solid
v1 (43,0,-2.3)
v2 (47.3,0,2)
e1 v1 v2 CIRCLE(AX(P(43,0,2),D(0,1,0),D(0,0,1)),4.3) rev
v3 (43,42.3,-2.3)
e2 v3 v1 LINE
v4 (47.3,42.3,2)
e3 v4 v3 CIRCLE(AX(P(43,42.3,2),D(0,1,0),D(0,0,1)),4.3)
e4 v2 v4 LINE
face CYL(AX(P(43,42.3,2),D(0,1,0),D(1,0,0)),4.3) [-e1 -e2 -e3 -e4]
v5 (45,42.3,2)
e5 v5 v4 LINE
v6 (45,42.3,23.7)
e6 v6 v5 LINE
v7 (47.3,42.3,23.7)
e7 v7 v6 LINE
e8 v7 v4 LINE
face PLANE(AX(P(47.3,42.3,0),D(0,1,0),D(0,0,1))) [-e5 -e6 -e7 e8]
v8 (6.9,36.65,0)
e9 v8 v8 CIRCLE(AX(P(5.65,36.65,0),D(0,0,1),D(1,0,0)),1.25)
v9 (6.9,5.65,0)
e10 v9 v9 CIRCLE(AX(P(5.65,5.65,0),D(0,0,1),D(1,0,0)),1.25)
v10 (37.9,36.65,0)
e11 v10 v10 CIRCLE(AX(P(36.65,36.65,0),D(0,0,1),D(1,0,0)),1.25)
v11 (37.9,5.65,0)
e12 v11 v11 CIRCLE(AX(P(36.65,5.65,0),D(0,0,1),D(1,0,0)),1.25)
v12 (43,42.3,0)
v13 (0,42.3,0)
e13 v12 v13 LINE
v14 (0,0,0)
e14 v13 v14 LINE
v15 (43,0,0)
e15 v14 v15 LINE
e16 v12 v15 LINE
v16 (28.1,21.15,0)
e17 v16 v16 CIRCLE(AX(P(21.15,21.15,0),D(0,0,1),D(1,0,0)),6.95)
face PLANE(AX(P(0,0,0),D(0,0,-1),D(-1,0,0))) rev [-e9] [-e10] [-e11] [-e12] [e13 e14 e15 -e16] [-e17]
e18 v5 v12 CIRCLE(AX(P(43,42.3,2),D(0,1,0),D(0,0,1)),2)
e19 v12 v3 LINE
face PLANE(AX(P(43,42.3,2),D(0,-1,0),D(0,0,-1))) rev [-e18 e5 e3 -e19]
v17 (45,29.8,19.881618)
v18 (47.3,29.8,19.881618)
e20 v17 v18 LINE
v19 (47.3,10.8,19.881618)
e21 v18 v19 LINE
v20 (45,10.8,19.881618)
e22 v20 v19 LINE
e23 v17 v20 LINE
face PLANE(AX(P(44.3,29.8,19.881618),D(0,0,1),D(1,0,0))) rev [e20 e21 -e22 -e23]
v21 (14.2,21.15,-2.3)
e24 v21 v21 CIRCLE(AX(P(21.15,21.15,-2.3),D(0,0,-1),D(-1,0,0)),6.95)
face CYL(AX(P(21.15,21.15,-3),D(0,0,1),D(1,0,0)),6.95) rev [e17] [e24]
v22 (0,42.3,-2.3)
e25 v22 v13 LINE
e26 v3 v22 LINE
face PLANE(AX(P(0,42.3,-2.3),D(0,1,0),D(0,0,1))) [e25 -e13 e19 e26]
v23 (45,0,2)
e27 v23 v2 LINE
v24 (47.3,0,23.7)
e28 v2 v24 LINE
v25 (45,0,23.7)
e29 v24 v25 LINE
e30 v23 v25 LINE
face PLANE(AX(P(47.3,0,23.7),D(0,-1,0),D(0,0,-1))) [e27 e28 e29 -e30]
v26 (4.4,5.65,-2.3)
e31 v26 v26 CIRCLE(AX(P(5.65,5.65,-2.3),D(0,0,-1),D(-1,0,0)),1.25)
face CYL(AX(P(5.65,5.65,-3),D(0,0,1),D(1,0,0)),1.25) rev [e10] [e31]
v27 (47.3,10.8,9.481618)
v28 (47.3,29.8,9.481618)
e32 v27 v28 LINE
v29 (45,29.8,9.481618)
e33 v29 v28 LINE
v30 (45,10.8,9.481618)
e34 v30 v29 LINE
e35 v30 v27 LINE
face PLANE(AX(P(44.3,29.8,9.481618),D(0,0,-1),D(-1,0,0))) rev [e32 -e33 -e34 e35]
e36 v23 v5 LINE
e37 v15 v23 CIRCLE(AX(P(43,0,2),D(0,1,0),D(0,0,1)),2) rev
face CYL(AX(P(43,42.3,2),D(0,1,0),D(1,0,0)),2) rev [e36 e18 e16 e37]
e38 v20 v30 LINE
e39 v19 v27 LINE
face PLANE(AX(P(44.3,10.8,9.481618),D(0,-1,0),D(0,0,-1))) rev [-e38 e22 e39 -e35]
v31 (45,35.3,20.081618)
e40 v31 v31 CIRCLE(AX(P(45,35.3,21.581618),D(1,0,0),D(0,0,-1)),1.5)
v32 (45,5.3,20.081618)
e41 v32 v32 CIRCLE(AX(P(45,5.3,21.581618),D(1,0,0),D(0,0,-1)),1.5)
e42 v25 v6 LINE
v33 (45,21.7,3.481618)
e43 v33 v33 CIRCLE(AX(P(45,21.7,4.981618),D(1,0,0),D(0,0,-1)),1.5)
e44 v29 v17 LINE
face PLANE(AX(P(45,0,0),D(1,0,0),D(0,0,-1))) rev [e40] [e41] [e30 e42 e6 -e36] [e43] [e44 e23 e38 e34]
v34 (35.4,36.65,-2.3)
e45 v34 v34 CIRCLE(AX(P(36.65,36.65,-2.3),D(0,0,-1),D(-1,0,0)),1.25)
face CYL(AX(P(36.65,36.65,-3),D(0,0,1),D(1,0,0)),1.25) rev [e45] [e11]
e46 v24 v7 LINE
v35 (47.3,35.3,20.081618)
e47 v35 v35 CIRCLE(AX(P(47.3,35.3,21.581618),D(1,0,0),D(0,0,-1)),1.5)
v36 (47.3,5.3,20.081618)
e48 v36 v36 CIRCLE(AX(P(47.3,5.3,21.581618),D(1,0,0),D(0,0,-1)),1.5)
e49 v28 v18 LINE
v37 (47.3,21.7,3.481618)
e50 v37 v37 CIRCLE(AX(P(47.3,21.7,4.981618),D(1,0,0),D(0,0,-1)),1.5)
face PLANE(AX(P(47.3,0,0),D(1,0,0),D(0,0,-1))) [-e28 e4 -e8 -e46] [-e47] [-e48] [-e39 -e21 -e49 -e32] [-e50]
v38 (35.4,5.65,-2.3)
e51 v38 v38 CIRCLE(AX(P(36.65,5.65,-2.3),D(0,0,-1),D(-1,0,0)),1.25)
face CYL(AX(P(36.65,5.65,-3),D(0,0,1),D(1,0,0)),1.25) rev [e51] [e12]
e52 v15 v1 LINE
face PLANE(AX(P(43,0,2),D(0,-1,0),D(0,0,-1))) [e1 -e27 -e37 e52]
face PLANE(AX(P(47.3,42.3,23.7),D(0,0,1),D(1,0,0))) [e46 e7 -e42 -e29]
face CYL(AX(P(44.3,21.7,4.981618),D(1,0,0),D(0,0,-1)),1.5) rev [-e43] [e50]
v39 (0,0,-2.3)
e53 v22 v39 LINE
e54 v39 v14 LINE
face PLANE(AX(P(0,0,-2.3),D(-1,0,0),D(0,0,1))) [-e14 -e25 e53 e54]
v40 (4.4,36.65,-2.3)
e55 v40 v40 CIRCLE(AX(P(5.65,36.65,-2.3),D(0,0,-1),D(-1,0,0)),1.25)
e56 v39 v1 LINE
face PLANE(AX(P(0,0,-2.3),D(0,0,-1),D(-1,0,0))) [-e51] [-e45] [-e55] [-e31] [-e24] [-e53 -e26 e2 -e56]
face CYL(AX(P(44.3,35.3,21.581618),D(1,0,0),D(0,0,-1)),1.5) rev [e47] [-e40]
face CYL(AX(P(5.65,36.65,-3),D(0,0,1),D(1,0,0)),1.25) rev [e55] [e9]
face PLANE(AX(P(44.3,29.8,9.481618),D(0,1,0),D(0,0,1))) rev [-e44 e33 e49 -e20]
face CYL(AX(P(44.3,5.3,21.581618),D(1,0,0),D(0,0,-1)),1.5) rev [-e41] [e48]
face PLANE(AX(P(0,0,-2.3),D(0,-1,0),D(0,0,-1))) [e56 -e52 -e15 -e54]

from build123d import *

# Parameters (mm, degrees)
SKETCH1_W                    = 47.3
SKETCH1_H                    = 42.3
BASE_FLANGE1_DEPTH           = 2.3
EDGE_FLANGE1_STRIP_W         = 13.2
EDGE_FLANGE1_STRIP_H         = 2.3
EDGE_FLANGE1_STRIP_CUT_DEPTH = 42.3
EDGE_FLANGE1_DEPTH           = 42.3
SKETCH9_W                    = 10.4
SKETCH9_H                    = 19
CUT_EXTRUDE1_DEPTH           = 3
SKETCH10_R                   = 1.5
CUT_EXTRUDE2_DEPTH           = 3
SKETCH11_R                   = 1.25
CUT_EXTRUDE5_DEPTH           = 3
SKETCH22_R                   = 6.95
CUT_EXTRUDE6_DEPTH           = 3


# Sheet-metal steps are written as plain solids
with BuildPart() as part:
    # Sketch1 → Base-Flange1 (new body)
    with BuildSketch(Plane.XY):
        with Locations((23.65, 21.15)):
            Rectangle(SKETCH1_W, SKETCH1_H)
    extrude(amount=-BASE_FLANGE1_DEPTH)

    # Edge-Flange1 strip (across the edge) → Edge-Flange1 strip cut (cut)
    with BuildSketch(Plane(origin=(47.3, 0, 0), x_dir=(-1, 0, 0), z_dir=(0, 1, 0))):
        with Locations((-2.3, -1.15)):
            Rectangle(EDGE_FLANGE1_STRIP_W, EDGE_FLANGE1_STRIP_H)
    extrude(amount=EDGE_FLANGE1_STRIP_CUT_DEPTH, mode=Mode.SUBTRACT)

    # Edge-Flange1 section (across the edge) → Edge-Flange1 (add)
    with BuildSketch(Plane(origin=(47.3, 0, 0), x_dir=(-1, 0, 0), z_dir=(0, 1, 0))):
        with BuildLine():
            Line((0, 2), (0, 23.7))
            Line((0, 23.7), (2.3, 23.7))
            Line((2.3, 23.7), (2.3, 2))
            ThreePointArc((2.3, 2), (2.885786438, 0.585786438), (4.3, 0))
            Line((4.3, 0), (4.3, -2.3))
            ThreePointArc((4.3, -2.3), (1.259440841, -1.040559159), (0, 2))
        make_face()
    extrude(amount=EDGE_FLANGE1_DEPTH)

    # Sketch9 → Cut-Extrude1 (cut)
    with BuildSketch(Plane(origin=(47.3, -232.998028616, -457.703147412), x_dir=(0, 0, -1), z_dir=(1, 0, 0))):
        with Locations((-472.38476551, 253.298028616)):
            Rectangle(SKETCH9_W, SKETCH9_H)
    extrude(amount=-CUT_EXTRUDE1_DEPTH, mode=Mode.SUBTRACT)

    # Sketch10 → Cut-Extrude2 (cut)
    with BuildSketch(Plane(origin=(47.3, -232.998028616, -457.703147412), x_dir=(0, 0, -1), z_dir=(1, 0, 0))):
        with Locations((-479.28476551, 268.298028616)):
            Circle(SKETCH10_R)
        with Locations((-462.68476551, 254.698028616)):
            Circle(SKETCH10_R)
        with Locations((-479.28476551, 238.298028616)):
            Circle(SKETCH10_R)
    extrude(amount=-CUT_EXTRUDE2_DEPTH, mode=Mode.SUBTRACT)

    # Sketch11 → Cut-Extrude5 (cut)
    with BuildSketch(Plane.XY):
        with Locations((5.65, 5.65)):
            Circle(SKETCH11_R)
        with Locations((5.65, 36.65)):
            Circle(SKETCH11_R)
        with Locations((36.65, 5.65)):
            Circle(SKETCH11_R)
        with Locations((36.65, 36.65)):
            Circle(SKETCH11_R)
    extrude(amount=-CUT_EXTRUDE5_DEPTH, mode=Mode.SUBTRACT)

    # Sketch22 → Cut-Extrude6 (cut)
    with BuildSketch(Plane.XY):
        with Locations((21.15, 21.15)):
            Circle(SKETCH22_R)
    extrude(amount=-CUT_EXTRUDE6_DEPTH, mode=Mode.SUBTRACT)


solid = part.part
